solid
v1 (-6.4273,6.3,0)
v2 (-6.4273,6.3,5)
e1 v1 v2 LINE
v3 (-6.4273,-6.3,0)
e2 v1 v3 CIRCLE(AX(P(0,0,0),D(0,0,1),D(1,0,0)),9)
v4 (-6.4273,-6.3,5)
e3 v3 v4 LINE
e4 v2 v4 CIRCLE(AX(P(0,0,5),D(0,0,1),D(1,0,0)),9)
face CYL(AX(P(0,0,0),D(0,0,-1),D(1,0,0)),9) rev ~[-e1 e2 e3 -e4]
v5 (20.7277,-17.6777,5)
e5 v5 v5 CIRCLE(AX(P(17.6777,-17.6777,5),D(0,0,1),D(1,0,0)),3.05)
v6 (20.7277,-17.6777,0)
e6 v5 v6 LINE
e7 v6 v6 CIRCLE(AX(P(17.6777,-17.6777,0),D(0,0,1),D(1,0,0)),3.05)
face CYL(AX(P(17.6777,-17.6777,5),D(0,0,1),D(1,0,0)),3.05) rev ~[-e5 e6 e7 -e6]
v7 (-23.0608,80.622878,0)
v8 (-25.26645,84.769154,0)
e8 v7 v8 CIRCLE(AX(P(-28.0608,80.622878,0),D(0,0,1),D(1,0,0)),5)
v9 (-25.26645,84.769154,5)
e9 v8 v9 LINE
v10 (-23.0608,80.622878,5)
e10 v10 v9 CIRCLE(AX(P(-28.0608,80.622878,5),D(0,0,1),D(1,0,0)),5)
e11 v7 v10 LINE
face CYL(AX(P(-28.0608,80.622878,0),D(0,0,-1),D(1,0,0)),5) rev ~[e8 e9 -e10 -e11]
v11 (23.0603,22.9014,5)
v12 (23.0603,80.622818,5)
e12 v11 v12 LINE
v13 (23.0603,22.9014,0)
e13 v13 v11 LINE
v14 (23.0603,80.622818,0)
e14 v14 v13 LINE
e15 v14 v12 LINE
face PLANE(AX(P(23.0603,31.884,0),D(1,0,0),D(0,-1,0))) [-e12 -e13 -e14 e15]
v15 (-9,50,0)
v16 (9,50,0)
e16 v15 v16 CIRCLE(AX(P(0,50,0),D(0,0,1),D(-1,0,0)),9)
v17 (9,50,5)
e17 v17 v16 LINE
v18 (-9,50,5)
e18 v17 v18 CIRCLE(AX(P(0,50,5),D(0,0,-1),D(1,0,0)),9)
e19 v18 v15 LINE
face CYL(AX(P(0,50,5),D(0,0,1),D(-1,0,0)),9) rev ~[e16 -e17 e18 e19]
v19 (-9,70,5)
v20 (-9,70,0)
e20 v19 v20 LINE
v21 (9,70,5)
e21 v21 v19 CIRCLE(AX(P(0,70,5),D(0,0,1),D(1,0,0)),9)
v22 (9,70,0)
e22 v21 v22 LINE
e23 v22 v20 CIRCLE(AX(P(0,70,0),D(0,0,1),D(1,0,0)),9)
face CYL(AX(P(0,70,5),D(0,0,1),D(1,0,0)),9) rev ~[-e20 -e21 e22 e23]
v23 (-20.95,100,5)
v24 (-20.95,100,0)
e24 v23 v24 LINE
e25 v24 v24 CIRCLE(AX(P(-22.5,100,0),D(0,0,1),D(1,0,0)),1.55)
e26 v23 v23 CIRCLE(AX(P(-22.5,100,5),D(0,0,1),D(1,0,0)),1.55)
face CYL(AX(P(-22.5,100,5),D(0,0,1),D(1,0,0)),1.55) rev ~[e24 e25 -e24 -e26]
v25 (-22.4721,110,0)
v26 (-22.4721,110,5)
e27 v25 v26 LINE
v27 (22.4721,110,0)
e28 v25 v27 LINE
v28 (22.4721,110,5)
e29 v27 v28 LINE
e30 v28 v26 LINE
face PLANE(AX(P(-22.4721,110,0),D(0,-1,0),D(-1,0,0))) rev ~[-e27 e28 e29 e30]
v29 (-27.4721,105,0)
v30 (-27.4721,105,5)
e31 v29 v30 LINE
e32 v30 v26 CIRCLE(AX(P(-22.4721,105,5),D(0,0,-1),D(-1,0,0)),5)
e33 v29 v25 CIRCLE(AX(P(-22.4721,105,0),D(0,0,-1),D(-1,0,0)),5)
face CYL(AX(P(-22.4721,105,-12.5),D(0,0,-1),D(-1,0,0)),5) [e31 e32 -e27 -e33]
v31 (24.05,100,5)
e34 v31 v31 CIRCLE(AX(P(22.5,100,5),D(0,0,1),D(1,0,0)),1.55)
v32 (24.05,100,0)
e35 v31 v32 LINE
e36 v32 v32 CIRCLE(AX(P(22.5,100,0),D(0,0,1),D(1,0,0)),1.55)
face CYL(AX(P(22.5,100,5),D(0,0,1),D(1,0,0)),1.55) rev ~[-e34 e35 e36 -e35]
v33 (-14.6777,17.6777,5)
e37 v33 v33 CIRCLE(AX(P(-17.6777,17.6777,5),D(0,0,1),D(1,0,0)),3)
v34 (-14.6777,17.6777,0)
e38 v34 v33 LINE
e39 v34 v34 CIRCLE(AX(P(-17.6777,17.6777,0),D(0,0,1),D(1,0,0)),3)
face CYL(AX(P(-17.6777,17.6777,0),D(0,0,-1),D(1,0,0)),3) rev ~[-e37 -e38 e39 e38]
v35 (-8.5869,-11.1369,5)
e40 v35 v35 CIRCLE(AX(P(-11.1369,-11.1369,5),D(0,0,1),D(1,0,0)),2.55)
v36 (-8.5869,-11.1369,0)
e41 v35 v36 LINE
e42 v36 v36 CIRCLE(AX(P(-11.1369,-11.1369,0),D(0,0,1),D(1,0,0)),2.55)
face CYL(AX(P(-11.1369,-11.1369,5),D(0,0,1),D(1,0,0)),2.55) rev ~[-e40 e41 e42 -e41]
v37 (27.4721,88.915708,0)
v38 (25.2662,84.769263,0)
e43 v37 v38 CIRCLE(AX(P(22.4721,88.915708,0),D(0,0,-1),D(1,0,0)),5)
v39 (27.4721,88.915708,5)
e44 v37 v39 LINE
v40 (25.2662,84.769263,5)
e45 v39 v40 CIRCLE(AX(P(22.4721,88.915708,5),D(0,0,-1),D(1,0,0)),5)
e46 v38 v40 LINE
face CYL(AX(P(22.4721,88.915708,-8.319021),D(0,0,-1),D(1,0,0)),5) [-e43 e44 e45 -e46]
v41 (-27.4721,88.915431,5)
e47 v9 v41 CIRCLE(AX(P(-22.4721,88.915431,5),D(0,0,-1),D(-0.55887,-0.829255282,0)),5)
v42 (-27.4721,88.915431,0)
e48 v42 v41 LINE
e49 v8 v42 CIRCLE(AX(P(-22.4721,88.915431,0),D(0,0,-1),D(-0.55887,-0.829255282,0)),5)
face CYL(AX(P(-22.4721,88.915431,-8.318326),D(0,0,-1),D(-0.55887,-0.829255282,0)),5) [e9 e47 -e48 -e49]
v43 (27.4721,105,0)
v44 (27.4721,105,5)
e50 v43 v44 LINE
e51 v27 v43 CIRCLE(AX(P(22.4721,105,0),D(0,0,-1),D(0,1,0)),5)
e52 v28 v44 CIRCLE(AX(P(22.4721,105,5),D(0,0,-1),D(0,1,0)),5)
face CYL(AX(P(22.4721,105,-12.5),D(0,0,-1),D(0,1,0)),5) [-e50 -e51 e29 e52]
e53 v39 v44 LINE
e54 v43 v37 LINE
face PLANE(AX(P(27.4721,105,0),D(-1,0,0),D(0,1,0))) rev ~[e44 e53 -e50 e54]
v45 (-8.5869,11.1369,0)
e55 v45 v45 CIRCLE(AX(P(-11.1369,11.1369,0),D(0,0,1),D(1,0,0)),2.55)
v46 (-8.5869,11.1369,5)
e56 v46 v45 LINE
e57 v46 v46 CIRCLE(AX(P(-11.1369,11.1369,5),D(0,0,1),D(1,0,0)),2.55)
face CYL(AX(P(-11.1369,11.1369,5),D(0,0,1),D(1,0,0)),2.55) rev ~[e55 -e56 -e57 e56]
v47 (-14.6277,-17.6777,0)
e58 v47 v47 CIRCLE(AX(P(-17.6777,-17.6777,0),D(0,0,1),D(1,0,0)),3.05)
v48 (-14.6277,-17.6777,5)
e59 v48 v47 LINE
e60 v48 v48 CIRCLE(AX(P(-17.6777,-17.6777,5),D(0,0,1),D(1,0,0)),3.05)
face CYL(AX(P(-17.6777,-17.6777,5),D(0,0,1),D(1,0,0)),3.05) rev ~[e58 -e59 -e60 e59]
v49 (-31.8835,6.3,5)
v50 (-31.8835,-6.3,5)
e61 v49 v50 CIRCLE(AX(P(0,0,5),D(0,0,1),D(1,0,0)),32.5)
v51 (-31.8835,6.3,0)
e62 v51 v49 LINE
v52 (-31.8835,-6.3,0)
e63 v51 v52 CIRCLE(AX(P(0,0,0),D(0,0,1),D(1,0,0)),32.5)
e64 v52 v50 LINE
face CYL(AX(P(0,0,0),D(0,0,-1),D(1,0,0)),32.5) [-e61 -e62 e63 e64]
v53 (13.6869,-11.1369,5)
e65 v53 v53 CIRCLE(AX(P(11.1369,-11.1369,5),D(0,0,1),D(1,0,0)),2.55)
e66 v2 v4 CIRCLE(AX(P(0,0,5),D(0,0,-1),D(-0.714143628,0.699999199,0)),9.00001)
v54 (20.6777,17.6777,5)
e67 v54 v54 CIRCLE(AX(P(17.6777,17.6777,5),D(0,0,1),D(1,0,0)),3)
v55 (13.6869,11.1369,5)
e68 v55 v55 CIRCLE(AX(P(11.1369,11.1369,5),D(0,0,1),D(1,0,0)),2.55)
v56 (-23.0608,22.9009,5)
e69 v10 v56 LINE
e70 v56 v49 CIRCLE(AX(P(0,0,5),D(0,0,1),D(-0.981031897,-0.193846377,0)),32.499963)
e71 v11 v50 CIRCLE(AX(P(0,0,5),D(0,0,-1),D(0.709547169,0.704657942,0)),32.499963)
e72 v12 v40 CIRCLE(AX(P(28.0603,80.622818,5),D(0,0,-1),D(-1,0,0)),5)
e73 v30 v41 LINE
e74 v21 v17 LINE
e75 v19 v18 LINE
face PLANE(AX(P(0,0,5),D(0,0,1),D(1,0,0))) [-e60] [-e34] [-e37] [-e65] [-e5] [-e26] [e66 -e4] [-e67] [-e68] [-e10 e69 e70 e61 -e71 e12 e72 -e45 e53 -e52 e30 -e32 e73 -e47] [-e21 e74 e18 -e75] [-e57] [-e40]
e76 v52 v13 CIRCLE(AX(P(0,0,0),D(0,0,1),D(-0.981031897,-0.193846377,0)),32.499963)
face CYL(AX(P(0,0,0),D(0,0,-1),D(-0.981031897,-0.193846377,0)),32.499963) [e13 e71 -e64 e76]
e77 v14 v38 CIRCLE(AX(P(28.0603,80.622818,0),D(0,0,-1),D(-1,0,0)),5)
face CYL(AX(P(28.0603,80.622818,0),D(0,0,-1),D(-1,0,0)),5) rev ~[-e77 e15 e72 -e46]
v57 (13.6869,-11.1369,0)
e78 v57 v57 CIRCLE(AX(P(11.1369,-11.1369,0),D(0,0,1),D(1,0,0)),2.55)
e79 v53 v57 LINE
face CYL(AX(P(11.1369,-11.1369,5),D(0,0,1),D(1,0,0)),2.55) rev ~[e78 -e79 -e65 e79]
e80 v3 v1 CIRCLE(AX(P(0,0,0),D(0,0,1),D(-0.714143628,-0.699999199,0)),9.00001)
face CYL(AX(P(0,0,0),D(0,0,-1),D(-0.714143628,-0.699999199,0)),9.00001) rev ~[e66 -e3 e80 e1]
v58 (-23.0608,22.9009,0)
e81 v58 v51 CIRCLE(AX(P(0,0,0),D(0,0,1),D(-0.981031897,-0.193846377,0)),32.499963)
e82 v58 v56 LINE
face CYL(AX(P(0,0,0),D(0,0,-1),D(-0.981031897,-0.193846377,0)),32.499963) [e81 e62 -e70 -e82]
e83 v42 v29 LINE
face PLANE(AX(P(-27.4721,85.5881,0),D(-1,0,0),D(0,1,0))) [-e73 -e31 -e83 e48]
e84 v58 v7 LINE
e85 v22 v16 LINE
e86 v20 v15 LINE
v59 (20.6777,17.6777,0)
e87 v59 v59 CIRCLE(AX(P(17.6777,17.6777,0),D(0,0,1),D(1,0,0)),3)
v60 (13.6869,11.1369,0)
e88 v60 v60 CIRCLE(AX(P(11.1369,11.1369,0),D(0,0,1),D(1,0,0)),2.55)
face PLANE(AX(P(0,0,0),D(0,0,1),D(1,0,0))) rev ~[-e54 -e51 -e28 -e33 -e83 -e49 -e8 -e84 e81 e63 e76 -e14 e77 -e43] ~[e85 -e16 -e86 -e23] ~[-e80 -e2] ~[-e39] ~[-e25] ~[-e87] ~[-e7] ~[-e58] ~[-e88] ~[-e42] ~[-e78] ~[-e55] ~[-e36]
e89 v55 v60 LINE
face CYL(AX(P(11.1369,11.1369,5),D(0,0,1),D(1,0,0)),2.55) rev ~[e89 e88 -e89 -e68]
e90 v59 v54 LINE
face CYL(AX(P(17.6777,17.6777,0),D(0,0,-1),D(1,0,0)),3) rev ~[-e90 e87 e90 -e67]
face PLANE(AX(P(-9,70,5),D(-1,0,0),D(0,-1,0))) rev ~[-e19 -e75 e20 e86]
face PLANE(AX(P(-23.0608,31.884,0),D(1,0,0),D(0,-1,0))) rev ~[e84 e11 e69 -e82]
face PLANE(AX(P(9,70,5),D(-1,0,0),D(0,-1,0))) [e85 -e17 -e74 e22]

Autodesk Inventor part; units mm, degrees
ref_plane "YZ Plane" through (0, 0, 0) normal (1, 0, 0) x (0, 1, 0)
ref_plane "XZ Plane" through (0, 0, 0) normal (0, 1, 0) x (-1, 0, 0)
ref_plane "XY Plane" through (0, 0, 0) normal (0, 0, 1) x (1, 0, 0)
sketch "Sketch1" plane through (0, 0, 0) normal (0, 0, 1) x (1, 0, 0)
  circle A0 centre (17.6777, -17.6777) radius 3
  circle A1 centre (-17.6777, -17.6777) radius 3
  circle A2 centre (-17.6777, 17.6777) radius 3
  circle A3 centre (17.6777, 17.6777) radius 3
  circle A4 centre (-11.1369, -11.1369) radius 2.5
  circle A5 centre (11.1369, -11.1369) radius 2.5
  circle A6 centre (-11.1369, 11.1369) radius 2.5
  circle A7 centre (11.1369, 11.1369) radius 2.5
  arc A8 (-6.4273, -6.3) -> (-6.4273, 6.3) centre (0, 0) ccw
  arc A9 (-31.8835, -6.3) -> (-31.8835, 6.3) centre (0, 0) ccw
  circle A10 centre (0, 0) radius 32.5
  circle A11 centre (0, 0) radius 9
  line L0 (22.4721, 110) -> (-22.4721, 110)
  line L1 (-27.4721, 105) -> (-27.4721, 90)
  line L2 (-23.0608, 85.5886) -> (-23.0608, 31.884)
  line L3 (23.0603, 31.884) -> (23.0603, 85.5881)
  line L4 (27.4721, 90) -> (27.4721, 105)
  circle A12 centre (22.5, 100) radius 1.5
  circle A13 centre (-22.5, 100) radius 1.5
  circle A14 centre (11.1369, -11.1369) radius 2.5
  circle A15 centre (11.1369, 11.1369) radius 2.5
  circle A16 centre (-11.1369, 11.1369) radius 2.5
  circle A17 centre (-11.1369, -11.1369) radius 2.5
  line L5 (27.4721, 105) -> (27.4721, 110)
  line L6 (27.4721, 110) -> (-27.4721, 110)
  line L7 (-27.4721, 110) -> (-27.4721, 105)
  line L8 (27.4721, 90) -> (27.4721, 85.5881)
  line L9 (27.4721, 85.5881) -> (-27.4721, 85.5881)
  line L10 (-27.4721, 85.5881) -> (-27.4721, 90)
  line L11 (-23.0608, 31.884) -> (-23.0608, 22.9009)
  line L12 (23.0603, 31.884) -> (23.0603, 22.9014)
  point P0 (-31.8835, 6.3)
  point P1 (-23.0608, 85.5881)
  point P2 (-6.4273, 6.3)
extrude "Extrusion1" add sketch "Sketch1" along normal blind 5
fillet "Fillet1" radius 5 6 edges at (-27.4721, 110, 2.5) (27.4721, 110, 2.5) (-27.4721, 85.5881, 2.5) (-23.0608, 85.5881, 2.5) (27.4721, 85.5881, 2.5) (23.0603, 85.5881, 2.5)
sketch "Sketch2" plane through (0, 0, 5) normal (0, 0, 1) x (1, 0, 0)
  circle A0 centre (-22.5, 100) radius 1.5 projected
  arc A1 (9, 70) -> (-9, 70) centre (0, 70) ccw
  line L0 (-9, 70) -> (-9, 50)
  line L1 (9, 70) -> (9, 50)
  line L2 (0, 40) -> (0, 50)
  arc A2 (-9, 50) -> (9, 50) centre (0, 50) ccw
  point P0 (0, 0)
  dimension "d9" = 18
  dimension "d12" = 10
  dimension "d13" = 18
extrude "Extrusion2" cut sketch "Sketch2" against normal blind 10 contours L1 A2 L0 A1
sketch "Sketch3" plane through (0, 0, 5) normal (0, 0, 1) x (1, 0, 0)
  circle A0 centre (-22.5, 100) radius 1.5 projected
  circle A1 centre (-22.5, 100) radius 1.55
  circle A2 centre (22.5, 100) radius 1.5 projected
  circle A3 centre (22.5, 100) radius 1.55
  circle A4 centre (-17.6777, 17.6777) radius 3 projected
  circle A5 centre (-17.6777, 17.6777) radius 3.05
  circle A6 centre (17.6777, 17.6777) radius 3 projected
  circle A7 centre (17.6777, 17.6777) radius 3.05
  circle A8 centre (17.6777, -17.6777) radius 3 projected
  circle A9 centre (17.6777, -17.6777) radius 3.05
  circle A10 centre (-17.6777, -17.6777) radius 3 projected
  circle A11 centre (-17.6777, -17.6777) radius 3.05
  circle A12 centre (-11.1369, 11.1369) radius 2.5 projected
  circle A13 centre (-11.1369, 11.1369) radius 2.55
  circle A14 centre (11.1369, 11.1369) radius 2.5 projected
  circle A15 centre (11.1369, 11.1369) radius 2.55
  circle A16 centre (11.1369, -11.1369) radius 2.5 projected
  circle A17 centre (11.1369, -11.1369) radius 2.55
  circle A18 centre (-11.1369, -11.1369) radius 2.5 projected
  circle A19 centre (-11.1369, -11.1369) radius 2.55
  point P0 (0, 0)
  dimension "d14" = 3.1
  dimension "d15" = 3.1
  dimension "d16" = 6.1
  dimension "d17" = 6.1
  dimension "d18" = 6.1
  dimension "d19" = 6.1
  dimension "d20" = 5.1
  dimension "d21" = 5.1
  dimension "d22" = 5.1
  dimension "d23" = 5.1
extrude "Extrusion3" cut sketch "Sketch3" against normal blind 10 contours A0 | A1 | A2 | A3 | A4 | A6 | A8 | A9 | A10 | A11 | A12 | A13 | A14 | A15 | A16 | A17 | A18 | A19
properties part number "Part2_Camera"
